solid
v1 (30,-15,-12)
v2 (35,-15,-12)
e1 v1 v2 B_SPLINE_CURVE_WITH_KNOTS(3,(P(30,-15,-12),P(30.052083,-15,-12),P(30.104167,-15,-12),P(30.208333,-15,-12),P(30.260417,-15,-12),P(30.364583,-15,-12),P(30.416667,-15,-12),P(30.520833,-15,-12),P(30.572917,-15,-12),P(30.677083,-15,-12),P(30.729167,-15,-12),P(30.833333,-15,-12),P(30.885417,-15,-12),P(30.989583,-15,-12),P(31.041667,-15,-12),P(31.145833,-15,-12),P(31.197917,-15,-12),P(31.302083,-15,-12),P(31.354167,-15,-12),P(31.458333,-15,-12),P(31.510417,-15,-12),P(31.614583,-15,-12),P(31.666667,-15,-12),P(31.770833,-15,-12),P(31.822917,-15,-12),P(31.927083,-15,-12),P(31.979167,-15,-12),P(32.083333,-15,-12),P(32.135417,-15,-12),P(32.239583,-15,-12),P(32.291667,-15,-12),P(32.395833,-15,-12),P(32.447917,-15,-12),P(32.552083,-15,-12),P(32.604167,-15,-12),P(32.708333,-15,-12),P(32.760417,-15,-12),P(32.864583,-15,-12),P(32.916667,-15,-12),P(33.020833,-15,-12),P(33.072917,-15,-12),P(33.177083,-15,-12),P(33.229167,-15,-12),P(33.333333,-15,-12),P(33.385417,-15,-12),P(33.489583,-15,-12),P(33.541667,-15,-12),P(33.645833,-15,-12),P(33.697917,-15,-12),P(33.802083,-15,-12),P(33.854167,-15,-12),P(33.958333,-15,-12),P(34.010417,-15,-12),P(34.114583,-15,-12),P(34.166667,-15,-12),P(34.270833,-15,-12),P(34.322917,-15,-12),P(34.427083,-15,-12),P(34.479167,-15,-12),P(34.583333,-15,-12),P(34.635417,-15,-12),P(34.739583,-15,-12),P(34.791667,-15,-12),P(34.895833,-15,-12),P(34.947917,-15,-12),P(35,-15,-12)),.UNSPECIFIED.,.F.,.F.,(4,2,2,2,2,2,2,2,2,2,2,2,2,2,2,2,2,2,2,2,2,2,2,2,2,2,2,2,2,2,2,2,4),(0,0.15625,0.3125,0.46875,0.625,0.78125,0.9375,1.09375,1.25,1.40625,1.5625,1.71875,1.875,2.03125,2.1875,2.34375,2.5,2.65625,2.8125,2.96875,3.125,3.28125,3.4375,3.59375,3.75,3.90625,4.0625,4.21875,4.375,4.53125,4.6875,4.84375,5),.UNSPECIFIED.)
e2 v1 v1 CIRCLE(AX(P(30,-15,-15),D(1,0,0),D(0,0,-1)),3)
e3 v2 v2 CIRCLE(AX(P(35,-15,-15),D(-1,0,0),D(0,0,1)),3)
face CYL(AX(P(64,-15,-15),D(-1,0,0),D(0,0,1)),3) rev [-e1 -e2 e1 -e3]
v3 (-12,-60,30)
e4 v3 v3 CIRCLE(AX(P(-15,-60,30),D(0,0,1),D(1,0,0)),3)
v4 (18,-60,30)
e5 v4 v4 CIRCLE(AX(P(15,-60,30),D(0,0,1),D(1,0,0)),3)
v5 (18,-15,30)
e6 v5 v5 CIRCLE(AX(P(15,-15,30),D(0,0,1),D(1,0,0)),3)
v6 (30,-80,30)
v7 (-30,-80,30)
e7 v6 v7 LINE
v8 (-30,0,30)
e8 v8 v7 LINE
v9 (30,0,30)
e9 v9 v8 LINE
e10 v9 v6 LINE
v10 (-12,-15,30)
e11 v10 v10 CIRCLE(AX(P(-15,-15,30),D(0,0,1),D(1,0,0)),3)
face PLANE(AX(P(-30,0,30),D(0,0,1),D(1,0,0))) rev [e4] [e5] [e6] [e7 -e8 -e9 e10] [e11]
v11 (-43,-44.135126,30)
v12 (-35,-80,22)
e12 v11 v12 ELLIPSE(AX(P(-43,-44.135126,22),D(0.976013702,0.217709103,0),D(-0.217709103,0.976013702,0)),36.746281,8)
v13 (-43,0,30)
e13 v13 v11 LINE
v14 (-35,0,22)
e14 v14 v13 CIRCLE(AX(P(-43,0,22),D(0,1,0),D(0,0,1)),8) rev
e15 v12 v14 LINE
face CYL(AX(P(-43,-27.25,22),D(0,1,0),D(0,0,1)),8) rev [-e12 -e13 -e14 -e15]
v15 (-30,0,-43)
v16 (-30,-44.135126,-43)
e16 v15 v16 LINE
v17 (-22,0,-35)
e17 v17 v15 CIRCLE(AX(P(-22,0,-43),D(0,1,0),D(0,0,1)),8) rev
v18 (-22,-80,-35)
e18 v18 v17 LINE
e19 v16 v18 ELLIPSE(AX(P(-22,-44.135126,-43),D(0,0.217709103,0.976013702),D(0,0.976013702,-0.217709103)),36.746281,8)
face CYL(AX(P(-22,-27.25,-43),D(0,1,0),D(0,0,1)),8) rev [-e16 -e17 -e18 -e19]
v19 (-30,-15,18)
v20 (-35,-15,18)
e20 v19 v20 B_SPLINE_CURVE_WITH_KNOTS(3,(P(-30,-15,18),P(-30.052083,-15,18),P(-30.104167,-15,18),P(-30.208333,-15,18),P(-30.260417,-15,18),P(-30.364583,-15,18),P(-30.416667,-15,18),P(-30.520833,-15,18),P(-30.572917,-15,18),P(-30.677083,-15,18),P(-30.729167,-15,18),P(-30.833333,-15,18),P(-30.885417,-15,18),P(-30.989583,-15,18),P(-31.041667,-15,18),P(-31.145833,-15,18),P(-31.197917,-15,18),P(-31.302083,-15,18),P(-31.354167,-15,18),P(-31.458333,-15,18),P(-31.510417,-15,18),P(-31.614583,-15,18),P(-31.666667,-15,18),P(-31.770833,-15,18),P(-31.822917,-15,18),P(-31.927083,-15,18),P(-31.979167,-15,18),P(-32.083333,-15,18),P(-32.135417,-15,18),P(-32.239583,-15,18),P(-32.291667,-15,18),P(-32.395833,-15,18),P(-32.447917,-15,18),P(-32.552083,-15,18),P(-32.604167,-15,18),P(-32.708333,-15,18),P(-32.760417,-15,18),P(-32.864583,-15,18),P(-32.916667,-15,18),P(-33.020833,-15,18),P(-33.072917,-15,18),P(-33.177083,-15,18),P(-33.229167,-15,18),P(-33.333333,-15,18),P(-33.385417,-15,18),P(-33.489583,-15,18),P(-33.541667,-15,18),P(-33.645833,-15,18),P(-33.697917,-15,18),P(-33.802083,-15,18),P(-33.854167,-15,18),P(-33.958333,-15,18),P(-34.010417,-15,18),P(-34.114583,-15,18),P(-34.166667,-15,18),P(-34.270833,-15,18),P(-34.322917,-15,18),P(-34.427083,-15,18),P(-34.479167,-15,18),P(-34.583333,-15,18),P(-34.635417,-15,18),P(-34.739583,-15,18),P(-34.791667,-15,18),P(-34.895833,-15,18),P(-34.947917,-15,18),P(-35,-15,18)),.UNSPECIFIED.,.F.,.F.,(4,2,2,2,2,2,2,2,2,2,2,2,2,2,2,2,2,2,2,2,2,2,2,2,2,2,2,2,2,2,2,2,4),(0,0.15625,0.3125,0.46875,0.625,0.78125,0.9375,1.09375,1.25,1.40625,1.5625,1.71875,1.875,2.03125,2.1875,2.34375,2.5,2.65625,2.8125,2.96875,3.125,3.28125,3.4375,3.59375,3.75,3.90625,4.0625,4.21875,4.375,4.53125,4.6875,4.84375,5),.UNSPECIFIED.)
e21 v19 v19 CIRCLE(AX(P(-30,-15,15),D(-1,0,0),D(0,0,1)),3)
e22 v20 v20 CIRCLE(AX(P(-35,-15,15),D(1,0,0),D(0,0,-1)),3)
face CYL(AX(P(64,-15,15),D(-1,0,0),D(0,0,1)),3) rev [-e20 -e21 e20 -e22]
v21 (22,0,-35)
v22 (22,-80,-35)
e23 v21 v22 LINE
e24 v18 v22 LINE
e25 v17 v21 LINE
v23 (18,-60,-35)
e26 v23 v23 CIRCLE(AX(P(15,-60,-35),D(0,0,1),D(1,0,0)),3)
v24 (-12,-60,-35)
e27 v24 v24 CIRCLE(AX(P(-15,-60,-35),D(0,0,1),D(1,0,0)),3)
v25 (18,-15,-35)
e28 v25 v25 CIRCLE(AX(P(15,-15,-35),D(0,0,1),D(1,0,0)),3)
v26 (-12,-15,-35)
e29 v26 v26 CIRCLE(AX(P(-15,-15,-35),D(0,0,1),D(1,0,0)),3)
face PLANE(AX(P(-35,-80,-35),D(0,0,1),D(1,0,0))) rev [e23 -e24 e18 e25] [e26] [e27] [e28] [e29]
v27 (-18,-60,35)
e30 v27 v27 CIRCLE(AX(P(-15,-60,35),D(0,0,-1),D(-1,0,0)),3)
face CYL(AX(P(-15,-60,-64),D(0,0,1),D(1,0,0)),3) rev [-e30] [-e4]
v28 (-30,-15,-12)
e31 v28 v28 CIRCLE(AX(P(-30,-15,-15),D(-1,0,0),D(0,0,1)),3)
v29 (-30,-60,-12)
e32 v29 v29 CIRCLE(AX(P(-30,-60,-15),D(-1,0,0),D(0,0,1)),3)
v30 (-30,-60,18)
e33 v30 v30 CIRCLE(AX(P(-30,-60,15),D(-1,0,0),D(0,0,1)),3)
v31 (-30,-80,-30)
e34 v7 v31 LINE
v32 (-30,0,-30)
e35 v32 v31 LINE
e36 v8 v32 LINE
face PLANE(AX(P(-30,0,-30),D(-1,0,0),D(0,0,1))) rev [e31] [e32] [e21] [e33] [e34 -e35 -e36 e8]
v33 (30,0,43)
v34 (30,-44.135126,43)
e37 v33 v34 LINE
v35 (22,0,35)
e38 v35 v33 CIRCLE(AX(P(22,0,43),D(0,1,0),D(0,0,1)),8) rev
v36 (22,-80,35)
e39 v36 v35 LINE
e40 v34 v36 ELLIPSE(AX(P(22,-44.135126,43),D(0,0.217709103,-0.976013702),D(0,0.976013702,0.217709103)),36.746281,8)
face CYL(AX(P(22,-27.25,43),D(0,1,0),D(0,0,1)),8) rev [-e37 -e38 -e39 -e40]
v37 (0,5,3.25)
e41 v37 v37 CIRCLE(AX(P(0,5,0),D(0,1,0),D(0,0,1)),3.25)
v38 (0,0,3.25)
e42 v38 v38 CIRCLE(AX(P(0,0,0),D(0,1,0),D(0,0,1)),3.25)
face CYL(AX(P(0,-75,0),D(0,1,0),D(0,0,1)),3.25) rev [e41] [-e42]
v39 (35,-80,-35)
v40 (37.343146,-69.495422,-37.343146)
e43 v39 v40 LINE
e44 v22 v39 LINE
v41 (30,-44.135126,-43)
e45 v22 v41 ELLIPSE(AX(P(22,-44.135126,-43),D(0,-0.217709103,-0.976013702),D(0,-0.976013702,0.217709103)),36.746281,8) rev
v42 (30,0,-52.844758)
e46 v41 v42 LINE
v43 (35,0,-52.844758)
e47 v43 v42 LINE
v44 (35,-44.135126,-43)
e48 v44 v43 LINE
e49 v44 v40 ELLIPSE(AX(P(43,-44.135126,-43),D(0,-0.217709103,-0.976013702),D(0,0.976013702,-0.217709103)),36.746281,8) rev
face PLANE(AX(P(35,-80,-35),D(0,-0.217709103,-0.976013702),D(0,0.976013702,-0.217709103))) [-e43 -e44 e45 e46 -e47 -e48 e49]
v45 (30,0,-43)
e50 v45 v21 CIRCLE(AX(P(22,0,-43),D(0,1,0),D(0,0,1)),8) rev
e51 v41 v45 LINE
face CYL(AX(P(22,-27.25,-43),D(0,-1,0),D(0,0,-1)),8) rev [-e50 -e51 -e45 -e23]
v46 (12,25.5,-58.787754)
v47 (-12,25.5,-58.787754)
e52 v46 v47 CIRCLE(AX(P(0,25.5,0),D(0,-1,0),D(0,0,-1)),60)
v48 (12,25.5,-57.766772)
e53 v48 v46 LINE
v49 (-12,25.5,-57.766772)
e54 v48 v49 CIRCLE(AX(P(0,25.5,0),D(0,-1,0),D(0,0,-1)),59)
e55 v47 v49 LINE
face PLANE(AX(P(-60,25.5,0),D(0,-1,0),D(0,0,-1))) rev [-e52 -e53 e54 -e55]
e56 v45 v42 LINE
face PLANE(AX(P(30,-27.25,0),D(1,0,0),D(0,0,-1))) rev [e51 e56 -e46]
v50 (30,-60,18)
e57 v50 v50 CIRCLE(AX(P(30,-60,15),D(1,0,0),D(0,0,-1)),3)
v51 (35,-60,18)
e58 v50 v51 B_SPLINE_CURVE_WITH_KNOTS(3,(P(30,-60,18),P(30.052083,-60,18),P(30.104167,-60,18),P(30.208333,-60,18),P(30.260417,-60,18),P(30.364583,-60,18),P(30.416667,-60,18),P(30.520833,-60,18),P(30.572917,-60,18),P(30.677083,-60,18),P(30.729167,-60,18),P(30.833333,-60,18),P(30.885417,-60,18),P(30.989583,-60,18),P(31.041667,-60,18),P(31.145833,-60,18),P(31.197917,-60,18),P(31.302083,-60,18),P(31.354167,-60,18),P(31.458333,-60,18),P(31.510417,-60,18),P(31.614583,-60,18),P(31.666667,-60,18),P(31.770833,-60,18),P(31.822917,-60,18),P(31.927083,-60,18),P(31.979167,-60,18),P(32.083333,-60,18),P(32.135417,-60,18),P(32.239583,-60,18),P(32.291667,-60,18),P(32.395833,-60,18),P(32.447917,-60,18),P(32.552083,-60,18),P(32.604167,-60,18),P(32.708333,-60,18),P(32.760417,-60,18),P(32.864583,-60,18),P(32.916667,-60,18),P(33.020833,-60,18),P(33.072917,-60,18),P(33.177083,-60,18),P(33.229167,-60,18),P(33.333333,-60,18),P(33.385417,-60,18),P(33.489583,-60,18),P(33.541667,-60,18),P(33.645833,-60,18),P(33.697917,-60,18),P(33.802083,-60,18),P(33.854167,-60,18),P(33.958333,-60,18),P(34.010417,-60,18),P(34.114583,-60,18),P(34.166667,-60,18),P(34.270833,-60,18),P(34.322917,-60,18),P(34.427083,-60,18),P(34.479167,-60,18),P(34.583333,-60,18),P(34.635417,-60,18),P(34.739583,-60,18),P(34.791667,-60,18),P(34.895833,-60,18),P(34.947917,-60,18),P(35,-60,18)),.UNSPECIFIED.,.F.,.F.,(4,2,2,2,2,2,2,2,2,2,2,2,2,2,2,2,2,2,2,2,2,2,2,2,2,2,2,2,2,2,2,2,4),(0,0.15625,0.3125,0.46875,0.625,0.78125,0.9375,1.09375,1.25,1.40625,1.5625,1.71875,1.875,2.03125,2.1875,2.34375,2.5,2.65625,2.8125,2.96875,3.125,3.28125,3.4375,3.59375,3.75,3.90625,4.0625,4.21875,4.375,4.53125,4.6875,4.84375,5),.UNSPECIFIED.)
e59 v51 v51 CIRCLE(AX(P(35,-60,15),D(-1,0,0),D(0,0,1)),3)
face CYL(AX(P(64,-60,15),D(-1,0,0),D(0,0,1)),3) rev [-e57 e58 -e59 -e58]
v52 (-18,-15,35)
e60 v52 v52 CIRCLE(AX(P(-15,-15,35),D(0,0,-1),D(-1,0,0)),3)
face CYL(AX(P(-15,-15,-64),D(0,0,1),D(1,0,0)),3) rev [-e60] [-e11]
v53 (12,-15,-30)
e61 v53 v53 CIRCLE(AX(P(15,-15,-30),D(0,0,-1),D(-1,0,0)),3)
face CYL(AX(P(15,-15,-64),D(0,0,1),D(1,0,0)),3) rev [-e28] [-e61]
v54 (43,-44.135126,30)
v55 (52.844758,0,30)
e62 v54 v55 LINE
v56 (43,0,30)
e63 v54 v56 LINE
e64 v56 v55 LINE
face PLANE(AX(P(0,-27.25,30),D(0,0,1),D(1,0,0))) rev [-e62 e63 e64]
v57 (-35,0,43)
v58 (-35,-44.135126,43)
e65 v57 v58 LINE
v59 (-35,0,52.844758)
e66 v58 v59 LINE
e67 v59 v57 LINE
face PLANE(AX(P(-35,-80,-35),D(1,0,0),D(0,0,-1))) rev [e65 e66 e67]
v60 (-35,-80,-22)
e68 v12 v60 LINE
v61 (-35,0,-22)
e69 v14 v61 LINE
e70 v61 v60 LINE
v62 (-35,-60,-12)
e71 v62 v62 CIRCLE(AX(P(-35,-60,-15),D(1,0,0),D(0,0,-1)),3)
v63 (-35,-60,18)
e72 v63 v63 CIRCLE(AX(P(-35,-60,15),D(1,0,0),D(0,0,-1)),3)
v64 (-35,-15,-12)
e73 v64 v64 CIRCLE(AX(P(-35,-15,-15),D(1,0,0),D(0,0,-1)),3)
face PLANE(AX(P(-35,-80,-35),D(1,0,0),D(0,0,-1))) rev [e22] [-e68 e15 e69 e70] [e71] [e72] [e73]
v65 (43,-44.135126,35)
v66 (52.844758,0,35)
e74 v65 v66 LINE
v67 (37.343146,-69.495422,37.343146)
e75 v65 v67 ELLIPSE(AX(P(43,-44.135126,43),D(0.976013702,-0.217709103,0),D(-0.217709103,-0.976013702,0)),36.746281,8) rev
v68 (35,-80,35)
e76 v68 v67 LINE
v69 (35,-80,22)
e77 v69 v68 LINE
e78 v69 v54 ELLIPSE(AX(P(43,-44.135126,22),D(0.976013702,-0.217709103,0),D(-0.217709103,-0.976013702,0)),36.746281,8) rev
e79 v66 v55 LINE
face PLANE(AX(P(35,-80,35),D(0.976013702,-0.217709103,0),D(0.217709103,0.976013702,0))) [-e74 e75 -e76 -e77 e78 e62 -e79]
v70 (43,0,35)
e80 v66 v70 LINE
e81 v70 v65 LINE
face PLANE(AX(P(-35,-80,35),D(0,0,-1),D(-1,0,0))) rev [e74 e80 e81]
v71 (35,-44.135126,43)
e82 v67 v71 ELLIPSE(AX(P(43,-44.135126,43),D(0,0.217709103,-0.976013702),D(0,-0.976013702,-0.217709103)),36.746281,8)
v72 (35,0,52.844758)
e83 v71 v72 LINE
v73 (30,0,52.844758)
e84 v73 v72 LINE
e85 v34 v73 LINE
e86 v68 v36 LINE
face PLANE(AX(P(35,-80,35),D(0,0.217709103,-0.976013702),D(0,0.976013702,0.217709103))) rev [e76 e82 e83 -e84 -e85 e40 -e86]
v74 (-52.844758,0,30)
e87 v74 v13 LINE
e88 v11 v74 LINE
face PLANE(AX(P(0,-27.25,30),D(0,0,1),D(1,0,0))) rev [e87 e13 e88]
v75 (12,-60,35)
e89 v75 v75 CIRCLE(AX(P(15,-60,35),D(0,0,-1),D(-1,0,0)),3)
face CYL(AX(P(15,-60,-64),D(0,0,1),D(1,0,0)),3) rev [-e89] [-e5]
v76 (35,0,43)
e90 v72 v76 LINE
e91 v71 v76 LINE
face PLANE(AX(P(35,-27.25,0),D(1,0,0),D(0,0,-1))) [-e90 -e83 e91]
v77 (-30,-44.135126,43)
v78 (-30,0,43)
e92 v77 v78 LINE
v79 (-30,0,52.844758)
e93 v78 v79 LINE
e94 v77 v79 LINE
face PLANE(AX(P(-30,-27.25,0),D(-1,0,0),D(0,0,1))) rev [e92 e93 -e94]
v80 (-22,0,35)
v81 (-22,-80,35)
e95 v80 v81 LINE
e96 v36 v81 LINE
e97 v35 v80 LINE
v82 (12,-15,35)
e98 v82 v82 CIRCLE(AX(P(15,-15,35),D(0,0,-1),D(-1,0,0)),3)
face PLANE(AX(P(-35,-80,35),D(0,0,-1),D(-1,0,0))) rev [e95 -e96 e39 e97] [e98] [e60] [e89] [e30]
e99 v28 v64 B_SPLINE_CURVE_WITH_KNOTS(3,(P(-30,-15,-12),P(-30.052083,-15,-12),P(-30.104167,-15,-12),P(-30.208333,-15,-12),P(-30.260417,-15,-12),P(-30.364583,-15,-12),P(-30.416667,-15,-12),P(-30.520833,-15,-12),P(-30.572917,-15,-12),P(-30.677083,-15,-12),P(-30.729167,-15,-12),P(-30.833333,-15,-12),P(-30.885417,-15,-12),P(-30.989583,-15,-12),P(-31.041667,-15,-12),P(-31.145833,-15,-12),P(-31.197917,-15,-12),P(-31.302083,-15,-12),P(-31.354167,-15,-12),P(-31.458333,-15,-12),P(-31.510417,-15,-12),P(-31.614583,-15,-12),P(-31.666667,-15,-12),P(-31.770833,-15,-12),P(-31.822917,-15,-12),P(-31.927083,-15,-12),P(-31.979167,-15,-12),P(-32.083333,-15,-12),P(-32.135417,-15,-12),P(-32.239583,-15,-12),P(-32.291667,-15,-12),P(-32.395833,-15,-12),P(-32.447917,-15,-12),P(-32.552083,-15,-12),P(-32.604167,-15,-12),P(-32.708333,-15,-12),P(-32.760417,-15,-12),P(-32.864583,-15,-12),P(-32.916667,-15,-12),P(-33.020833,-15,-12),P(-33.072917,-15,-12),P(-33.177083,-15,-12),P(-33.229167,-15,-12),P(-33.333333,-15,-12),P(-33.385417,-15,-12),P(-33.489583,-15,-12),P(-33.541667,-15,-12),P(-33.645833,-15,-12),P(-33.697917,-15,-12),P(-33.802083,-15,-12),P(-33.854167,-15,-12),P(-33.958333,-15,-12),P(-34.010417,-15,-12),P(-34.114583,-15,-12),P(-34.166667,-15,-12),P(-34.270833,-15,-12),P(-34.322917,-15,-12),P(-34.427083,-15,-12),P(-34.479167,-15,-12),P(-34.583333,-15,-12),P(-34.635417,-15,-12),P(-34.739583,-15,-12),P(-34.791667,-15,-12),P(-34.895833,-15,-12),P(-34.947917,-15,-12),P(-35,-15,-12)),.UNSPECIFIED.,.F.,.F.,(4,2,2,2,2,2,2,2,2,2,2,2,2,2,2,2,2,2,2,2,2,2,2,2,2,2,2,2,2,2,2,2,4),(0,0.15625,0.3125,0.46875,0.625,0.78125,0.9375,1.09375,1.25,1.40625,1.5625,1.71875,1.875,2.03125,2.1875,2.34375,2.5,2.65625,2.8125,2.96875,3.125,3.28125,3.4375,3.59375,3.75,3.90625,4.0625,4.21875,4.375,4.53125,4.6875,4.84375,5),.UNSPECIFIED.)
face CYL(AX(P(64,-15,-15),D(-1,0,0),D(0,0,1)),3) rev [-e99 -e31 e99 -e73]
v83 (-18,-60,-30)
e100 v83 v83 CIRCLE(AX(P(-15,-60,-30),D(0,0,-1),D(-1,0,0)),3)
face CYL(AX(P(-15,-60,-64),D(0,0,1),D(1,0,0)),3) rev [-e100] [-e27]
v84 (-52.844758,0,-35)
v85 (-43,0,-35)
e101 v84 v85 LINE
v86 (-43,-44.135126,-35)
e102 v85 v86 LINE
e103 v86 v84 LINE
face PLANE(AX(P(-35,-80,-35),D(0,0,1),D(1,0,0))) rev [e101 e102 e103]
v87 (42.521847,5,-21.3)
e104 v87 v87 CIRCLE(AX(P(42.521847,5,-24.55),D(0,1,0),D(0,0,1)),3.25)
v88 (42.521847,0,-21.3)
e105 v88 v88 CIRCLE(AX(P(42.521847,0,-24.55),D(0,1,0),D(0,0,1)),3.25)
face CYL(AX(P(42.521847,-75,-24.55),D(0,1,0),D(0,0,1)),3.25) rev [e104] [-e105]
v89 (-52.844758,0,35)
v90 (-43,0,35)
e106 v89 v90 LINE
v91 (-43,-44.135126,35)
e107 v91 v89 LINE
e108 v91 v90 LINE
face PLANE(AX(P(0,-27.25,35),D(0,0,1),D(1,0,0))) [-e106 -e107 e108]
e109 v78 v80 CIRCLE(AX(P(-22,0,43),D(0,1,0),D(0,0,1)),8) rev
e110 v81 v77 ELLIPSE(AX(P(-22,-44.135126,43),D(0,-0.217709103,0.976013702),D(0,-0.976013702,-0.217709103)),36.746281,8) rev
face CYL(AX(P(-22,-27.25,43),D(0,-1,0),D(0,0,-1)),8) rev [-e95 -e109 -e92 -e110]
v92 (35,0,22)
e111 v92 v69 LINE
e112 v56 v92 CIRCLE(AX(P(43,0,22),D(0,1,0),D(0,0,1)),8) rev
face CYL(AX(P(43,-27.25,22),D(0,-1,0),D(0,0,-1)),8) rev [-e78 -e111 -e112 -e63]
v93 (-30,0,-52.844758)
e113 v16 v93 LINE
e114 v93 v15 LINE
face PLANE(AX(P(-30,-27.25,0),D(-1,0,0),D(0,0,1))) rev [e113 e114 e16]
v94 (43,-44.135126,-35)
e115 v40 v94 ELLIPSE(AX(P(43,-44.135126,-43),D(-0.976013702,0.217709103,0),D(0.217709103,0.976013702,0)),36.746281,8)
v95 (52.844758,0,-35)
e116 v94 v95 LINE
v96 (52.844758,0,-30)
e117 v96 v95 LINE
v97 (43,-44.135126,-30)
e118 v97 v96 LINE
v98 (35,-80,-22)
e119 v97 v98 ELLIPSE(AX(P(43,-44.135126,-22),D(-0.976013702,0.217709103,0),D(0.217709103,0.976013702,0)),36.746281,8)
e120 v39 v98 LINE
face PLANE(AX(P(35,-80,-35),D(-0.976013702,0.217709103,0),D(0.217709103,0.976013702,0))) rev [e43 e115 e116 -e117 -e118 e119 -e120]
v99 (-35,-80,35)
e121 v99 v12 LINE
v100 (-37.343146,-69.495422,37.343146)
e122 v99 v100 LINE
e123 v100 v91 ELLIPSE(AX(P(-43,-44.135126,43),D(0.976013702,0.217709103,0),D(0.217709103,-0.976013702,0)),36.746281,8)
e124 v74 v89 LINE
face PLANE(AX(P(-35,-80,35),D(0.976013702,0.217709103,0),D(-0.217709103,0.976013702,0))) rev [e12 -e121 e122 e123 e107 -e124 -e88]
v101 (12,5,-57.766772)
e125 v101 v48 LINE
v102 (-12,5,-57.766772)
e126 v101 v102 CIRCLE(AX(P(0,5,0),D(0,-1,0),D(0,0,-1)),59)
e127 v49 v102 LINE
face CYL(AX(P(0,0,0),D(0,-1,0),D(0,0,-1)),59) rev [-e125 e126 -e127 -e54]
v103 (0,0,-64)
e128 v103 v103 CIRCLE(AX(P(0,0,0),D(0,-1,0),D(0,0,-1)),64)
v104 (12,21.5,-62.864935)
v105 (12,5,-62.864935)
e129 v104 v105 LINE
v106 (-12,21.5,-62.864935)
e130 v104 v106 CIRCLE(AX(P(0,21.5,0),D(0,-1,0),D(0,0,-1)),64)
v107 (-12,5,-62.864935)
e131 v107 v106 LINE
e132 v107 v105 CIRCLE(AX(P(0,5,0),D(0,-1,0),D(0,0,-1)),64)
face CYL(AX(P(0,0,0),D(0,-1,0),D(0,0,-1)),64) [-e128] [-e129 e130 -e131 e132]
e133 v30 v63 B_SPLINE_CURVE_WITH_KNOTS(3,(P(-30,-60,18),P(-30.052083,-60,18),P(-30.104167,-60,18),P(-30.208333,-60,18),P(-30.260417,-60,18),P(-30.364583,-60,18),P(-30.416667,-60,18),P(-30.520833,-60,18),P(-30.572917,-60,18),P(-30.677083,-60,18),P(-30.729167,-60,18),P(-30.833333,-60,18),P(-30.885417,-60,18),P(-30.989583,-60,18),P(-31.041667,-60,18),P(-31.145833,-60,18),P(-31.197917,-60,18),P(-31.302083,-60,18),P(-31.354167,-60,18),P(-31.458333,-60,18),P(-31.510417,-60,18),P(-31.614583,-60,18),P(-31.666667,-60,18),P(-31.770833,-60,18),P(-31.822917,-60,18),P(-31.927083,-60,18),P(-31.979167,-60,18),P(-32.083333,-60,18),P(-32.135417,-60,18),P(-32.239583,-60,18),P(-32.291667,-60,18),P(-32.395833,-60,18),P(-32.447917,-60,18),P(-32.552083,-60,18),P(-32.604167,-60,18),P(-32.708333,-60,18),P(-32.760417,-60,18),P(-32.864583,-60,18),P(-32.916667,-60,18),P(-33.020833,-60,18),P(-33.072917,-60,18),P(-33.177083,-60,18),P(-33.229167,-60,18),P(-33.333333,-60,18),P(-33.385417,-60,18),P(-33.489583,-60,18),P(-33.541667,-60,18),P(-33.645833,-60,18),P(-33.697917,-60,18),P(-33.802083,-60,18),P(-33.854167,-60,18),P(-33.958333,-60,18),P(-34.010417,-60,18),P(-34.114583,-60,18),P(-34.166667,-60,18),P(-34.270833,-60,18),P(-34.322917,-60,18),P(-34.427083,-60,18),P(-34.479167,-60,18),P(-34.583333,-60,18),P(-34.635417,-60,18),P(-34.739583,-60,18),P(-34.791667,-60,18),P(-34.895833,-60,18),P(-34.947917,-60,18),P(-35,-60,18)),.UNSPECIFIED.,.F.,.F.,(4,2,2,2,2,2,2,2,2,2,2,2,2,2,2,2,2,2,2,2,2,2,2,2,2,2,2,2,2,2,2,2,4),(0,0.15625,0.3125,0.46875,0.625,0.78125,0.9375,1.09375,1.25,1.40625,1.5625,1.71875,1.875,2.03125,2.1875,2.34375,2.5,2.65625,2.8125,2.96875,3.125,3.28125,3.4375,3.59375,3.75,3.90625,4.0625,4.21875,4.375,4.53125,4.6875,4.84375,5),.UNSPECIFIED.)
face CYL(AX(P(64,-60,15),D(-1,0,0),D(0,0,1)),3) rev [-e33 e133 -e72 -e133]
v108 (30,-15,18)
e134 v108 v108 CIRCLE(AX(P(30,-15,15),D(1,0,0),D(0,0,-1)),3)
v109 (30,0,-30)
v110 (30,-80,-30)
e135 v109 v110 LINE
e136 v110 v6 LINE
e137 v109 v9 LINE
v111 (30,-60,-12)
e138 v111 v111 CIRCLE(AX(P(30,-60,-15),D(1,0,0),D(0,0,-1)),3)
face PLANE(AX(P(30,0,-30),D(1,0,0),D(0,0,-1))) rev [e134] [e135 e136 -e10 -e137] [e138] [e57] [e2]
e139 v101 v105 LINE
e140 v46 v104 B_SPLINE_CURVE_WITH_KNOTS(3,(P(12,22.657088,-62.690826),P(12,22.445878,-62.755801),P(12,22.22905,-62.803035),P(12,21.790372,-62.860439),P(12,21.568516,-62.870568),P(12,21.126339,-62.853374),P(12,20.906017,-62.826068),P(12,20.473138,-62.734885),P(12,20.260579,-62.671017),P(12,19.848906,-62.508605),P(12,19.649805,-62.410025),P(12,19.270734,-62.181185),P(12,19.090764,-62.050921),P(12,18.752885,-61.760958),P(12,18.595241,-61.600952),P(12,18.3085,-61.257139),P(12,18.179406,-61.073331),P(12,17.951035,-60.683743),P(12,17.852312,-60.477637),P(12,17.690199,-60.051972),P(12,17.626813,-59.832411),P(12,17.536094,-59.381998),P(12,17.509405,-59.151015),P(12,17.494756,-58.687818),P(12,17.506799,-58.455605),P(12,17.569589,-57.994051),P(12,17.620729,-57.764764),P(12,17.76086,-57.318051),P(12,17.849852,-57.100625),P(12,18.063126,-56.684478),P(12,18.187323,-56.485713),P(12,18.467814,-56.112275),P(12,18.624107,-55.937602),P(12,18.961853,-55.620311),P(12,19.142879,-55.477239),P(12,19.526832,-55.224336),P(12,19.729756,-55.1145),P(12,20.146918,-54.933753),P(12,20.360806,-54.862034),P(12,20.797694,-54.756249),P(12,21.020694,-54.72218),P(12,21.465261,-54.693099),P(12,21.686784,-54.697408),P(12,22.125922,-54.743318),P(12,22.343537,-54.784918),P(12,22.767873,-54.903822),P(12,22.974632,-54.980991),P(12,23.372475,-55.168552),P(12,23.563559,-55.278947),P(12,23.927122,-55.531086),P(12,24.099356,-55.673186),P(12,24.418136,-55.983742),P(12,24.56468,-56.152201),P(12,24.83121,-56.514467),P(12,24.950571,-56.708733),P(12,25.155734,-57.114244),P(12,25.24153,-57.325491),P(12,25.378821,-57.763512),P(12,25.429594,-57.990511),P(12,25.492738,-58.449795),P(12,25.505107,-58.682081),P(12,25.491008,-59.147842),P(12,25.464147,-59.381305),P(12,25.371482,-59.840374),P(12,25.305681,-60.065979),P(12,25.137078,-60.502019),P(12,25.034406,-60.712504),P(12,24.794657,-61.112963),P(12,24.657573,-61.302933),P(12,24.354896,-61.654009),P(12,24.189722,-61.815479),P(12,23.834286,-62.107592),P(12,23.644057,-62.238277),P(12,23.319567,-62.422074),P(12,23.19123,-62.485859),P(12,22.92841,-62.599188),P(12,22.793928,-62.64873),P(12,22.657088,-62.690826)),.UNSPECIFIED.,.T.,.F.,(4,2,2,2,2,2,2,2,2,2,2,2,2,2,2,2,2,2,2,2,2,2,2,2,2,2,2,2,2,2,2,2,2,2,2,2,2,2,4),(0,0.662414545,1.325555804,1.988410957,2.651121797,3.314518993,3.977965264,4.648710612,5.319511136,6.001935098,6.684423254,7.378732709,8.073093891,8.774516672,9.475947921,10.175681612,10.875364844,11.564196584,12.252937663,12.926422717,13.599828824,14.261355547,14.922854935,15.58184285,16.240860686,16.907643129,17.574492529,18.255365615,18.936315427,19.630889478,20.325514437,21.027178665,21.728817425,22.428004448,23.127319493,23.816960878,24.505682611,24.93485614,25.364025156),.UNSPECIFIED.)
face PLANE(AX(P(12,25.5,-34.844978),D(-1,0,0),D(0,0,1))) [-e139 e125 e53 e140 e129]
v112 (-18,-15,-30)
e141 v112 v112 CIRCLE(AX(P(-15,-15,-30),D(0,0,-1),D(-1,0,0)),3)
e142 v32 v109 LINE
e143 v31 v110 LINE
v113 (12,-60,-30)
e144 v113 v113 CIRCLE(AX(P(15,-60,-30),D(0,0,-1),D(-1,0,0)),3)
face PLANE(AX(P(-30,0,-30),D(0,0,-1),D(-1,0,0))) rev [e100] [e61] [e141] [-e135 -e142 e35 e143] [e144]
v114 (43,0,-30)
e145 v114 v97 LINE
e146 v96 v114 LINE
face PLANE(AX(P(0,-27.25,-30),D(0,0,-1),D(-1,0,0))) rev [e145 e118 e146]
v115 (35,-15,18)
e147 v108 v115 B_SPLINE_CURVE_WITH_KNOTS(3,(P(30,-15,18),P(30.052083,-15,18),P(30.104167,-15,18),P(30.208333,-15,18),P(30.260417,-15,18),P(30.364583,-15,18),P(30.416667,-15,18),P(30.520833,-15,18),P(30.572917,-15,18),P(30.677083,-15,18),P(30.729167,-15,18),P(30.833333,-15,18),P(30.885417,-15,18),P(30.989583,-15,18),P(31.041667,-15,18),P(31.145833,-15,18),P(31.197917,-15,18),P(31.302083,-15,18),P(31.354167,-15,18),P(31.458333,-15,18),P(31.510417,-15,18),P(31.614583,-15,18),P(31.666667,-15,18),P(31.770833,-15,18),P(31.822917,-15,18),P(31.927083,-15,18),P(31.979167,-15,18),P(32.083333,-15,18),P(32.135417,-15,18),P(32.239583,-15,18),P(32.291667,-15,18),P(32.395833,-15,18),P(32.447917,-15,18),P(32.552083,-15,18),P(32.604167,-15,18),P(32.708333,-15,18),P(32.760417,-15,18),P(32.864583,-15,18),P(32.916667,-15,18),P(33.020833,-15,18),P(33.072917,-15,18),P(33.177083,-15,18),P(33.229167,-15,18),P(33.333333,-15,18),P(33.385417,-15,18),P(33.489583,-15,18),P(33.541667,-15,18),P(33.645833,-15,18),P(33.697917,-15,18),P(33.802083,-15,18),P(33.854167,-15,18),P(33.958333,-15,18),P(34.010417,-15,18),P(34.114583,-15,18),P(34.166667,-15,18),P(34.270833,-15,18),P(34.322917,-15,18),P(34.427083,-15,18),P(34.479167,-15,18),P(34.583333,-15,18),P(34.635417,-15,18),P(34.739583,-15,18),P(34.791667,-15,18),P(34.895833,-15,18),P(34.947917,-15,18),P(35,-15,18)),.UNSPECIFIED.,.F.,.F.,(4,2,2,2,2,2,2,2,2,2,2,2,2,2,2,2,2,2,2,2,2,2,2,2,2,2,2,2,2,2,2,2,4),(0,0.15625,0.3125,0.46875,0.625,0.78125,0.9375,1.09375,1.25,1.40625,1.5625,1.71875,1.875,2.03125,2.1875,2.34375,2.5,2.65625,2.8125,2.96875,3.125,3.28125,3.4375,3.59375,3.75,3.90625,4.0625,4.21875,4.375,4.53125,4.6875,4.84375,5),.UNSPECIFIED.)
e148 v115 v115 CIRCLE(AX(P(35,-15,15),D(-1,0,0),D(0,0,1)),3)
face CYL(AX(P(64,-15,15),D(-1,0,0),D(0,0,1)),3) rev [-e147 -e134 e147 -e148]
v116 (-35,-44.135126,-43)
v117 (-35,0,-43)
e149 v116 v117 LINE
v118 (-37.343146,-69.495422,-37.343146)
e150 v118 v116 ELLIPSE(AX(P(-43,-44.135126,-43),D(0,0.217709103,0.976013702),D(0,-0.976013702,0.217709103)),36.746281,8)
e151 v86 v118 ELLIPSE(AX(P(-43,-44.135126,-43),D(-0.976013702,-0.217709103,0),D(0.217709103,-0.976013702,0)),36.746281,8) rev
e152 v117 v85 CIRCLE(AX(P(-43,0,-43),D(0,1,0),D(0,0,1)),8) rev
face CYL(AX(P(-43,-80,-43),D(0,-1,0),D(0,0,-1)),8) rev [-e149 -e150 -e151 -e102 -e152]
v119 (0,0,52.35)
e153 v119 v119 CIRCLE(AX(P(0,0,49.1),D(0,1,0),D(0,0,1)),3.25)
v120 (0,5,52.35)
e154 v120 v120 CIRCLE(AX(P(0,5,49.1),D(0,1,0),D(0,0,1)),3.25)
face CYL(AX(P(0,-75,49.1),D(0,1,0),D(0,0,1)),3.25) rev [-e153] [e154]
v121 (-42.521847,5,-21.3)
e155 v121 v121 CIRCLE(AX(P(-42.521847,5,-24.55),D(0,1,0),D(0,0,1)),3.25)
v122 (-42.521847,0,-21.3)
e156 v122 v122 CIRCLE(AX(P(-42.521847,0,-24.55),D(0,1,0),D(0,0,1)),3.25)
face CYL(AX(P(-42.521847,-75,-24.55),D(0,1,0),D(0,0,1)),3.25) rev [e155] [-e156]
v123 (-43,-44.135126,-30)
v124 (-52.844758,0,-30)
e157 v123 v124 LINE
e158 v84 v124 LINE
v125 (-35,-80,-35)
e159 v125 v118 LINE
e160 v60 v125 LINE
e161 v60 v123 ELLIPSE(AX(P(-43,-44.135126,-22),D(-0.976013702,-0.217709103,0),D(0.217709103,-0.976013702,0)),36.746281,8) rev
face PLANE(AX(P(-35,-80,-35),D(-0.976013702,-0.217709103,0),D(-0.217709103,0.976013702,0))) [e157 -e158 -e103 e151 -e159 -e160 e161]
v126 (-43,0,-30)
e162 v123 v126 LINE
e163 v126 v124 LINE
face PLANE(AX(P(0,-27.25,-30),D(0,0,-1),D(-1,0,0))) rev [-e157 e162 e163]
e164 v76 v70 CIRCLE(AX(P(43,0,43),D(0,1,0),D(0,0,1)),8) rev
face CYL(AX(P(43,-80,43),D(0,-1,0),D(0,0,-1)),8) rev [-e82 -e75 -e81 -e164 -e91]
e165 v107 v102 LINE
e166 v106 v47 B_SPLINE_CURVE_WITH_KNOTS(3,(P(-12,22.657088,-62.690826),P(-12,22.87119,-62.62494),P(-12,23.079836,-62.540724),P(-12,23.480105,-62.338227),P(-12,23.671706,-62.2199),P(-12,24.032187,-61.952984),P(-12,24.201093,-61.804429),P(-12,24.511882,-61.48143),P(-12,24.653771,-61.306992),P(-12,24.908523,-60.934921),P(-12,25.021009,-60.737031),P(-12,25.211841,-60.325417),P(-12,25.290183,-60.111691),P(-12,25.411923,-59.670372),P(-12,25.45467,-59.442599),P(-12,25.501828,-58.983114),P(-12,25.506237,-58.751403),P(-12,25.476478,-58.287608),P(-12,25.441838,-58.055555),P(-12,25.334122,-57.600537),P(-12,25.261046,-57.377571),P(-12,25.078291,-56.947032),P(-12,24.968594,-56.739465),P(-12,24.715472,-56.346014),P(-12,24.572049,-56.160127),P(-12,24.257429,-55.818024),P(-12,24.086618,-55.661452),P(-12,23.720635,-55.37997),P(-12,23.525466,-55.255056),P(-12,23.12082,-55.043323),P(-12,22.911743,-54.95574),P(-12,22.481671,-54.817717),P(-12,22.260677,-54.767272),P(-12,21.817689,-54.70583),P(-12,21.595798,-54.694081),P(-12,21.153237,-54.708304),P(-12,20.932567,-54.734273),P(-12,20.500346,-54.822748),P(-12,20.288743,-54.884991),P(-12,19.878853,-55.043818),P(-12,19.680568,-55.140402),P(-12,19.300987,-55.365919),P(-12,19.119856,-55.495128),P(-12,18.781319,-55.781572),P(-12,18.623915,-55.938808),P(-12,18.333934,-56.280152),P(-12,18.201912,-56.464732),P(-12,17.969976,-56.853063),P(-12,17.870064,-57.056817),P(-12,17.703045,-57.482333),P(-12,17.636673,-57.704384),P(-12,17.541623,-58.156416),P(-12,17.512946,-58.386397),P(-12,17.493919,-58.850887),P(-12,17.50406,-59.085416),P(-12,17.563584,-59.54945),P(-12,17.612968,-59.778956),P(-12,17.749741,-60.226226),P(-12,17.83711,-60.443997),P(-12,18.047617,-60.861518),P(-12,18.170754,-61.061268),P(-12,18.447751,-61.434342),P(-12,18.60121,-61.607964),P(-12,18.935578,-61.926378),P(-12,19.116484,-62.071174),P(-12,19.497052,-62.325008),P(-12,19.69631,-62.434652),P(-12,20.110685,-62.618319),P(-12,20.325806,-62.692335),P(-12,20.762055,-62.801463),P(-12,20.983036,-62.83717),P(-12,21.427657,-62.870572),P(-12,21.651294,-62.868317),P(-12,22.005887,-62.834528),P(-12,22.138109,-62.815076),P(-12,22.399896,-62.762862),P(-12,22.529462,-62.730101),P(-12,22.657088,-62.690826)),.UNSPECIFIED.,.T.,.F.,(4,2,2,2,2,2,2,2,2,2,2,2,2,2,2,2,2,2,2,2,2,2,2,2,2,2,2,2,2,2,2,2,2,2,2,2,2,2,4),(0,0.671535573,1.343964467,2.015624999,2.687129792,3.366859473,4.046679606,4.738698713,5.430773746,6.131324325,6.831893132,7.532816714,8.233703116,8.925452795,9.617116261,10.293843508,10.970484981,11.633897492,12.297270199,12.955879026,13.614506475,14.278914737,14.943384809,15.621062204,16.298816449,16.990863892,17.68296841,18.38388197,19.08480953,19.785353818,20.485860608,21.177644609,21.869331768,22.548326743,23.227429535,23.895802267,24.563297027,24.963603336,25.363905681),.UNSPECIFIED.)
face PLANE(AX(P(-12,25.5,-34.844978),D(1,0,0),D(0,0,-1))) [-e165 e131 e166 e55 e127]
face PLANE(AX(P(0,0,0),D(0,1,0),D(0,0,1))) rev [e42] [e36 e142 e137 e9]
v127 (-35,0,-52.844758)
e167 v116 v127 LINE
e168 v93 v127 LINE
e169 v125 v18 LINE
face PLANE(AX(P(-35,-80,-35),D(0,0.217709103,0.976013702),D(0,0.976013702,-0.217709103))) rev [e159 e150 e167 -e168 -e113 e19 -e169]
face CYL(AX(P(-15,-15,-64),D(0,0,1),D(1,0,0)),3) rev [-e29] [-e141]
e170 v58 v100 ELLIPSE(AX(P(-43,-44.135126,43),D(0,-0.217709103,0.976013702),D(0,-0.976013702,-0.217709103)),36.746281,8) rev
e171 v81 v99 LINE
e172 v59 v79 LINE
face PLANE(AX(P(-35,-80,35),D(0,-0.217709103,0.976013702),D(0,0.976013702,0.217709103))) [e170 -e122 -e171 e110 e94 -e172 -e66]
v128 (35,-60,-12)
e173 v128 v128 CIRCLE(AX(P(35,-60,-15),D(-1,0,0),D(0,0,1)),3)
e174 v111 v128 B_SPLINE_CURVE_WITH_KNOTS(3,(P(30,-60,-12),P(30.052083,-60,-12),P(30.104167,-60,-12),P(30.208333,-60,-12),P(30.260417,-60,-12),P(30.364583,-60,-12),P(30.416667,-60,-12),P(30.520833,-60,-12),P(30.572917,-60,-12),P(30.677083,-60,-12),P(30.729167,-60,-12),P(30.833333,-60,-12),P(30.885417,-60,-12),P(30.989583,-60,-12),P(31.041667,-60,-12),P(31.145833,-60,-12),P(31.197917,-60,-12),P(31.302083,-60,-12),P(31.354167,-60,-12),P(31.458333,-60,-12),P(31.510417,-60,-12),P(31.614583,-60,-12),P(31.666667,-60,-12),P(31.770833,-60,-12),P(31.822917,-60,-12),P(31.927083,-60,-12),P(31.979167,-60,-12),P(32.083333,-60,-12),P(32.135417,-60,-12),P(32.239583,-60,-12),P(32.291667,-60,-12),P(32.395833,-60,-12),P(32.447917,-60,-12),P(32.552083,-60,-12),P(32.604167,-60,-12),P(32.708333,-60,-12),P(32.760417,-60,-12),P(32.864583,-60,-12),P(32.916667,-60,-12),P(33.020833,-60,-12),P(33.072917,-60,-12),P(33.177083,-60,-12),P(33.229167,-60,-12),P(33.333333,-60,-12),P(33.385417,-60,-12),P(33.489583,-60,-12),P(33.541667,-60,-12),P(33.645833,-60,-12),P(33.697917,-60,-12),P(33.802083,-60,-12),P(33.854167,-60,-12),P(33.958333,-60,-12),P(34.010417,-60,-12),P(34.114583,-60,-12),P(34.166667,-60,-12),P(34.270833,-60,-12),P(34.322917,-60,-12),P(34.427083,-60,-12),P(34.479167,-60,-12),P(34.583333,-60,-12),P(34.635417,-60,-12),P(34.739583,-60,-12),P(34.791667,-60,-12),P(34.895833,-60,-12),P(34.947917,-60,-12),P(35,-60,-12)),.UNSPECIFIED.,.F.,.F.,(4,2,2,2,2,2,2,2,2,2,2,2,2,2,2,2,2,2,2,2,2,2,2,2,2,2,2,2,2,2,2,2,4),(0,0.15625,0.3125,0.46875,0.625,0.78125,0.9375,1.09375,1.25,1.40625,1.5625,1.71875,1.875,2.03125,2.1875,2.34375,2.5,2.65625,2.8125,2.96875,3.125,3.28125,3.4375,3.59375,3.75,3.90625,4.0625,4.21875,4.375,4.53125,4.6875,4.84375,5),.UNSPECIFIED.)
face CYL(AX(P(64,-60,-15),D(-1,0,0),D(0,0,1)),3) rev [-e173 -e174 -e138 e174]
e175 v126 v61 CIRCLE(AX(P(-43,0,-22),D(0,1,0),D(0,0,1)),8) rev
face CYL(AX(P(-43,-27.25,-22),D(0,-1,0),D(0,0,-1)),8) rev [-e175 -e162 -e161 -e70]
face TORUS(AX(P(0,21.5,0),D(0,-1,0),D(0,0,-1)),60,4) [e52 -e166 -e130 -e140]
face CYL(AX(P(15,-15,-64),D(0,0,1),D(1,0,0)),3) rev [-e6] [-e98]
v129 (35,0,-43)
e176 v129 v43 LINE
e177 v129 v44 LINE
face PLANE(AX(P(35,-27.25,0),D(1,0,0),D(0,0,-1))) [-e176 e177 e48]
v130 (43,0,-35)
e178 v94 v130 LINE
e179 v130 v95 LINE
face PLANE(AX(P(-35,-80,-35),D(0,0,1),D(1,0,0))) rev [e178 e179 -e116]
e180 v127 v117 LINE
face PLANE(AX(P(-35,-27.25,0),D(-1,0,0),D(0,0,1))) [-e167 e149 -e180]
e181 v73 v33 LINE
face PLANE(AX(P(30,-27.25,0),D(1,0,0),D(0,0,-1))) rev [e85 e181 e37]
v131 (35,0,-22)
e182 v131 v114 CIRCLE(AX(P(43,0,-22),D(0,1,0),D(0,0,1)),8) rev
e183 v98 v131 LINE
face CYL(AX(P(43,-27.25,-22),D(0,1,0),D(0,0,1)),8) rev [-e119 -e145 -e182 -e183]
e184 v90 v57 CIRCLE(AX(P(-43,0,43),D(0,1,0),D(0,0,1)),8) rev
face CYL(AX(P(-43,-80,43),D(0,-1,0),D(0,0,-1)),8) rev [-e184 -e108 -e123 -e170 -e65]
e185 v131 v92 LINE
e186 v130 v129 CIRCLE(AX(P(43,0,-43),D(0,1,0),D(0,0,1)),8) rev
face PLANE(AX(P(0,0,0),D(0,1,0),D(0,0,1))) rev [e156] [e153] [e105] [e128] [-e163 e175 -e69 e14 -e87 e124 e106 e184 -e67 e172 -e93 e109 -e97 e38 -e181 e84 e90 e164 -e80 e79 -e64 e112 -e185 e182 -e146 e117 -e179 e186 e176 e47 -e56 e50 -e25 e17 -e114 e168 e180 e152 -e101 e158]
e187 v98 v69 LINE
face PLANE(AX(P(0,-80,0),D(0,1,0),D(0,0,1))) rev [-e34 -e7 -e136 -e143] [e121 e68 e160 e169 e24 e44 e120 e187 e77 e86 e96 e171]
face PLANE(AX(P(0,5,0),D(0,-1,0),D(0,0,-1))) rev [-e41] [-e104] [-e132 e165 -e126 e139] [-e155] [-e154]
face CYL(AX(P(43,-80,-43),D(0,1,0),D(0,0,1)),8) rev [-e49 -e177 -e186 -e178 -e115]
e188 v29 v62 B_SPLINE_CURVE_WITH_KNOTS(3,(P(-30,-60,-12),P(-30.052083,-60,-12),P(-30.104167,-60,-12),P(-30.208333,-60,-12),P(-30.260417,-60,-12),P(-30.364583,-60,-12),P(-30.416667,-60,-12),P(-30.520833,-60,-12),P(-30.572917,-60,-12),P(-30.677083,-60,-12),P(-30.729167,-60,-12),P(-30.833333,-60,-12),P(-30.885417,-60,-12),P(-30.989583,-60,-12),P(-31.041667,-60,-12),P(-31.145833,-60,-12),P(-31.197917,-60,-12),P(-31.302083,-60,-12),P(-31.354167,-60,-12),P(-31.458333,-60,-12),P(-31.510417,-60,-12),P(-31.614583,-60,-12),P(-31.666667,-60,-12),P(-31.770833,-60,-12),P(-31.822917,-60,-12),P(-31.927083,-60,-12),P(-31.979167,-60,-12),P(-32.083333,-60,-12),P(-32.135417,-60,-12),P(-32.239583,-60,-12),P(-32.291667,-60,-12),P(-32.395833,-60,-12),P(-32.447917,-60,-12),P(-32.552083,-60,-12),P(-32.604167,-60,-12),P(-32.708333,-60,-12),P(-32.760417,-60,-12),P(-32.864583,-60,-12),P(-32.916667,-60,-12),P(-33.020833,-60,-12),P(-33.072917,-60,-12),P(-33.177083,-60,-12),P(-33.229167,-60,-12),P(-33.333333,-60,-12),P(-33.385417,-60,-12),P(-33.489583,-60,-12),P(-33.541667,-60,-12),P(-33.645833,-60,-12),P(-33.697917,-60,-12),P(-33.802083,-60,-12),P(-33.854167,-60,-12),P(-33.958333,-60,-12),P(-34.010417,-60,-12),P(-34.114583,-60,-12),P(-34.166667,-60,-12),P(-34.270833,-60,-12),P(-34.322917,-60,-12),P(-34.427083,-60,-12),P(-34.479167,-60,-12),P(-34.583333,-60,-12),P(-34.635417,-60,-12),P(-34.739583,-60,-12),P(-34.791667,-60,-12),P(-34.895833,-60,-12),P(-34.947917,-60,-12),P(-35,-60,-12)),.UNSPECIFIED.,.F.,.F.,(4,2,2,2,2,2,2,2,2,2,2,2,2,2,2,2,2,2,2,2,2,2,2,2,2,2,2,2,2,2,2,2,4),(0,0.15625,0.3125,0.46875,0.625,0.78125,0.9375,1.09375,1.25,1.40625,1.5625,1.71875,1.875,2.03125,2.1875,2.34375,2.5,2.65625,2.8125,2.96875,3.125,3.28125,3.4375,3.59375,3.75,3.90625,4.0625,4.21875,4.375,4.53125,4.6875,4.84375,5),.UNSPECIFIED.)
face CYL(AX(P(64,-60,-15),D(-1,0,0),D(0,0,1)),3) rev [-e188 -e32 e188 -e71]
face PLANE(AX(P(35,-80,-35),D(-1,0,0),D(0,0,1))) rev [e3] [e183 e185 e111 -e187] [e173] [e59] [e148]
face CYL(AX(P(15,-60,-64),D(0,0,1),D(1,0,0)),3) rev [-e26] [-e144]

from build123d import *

# Parameters (mm, degrees)
SKETCH_3_W                         = 70
SKETCH_3_H                         = 70
EXTRUDE_2_DEPTH                    = 80
SKETCH_5_W                         = 60
SKETCH_5_H                         = 60
CUT_EXTRUDE_2_DEPTH                = 80
SKETCH_6_R                         = 3.25
CUT_EXTRUDE_3_DEPTH                = 80
SKETCH_7_R                         = 3
CUT_EXTRUDE_4_DEPTH                = 143.467540163
RIB_13_REACH                       = 144.468
SKETCH_13_WALL_W                   = 368.901142734
SKETCH_13_WALL_H                   = 5
PATTERN_CIRCULAR_1_COUNT           = 4
PATTERN_CIRCULAR_1_COPY_1_REACH    = 144.468
PATTERN_CIRCULAR_1_COPY_1_SKETCH_W = 368.901142734
PATTERN_CIRCULAR_1_COPY_1_SKETCH_H = 5
PATTERN_CIRCULAR_1_COPY_2_REACH    = 144.468
PATTERN_CIRCULAR_1_COPY_2_SKETCH_W = 368.901142734
PATTERN_CIRCULAR_1_COPY_2_SKETCH_H = 5
PATTERN_CIRCULAR_1_COPY_3_REACH    = 144.468
PATTERN_CIRCULAR_1_COPY_3_SKETCH_W = 368.901142734
PATTERN_CIRCULAR_1_COPY_3_SKETCH_H = 5
SKETCH_15_W                        = 24
SKETCH_15_H                        = 39.427435321
CUT_EXTRUDE_5_DEPTH                = 125.165212519
FILLET_2_R                         = 8
PATTERN_CIRCULAR_2_COUNT           = 4


with BuildPart() as part:
    # 草图2 → 旋转1 (revolve)
    with BuildSketch(Plane.XY, mode=Mode.PRIVATE) as revolve_1_sk:
        with BuildLine():
            Line((-64, 5), (-64, 21.5))
            ThreePointArc((-64, 21.5), (-62.828427125, 24.328427125), (-60, 25.5))
            Line((-60, 25.5), (-59, 25.5))
            Line((-59, 25.5), (-59, 5))
            Line((-59, 5), (0, 5))
            Line((0, 5), (0, 0))
            Line((0, 0), (-64, 0))
            Line((-64, 0), (-64, 5))
        make_face()
    revolve(revolve_1_sk.sketch.rotate(Axis((0, 0, 0), (0, 1, 0)), 270), axis=Axis((0, 0, 0), (0, 1, 0)))

    # 草图3 → 凸台-拉伸2 (add)
    with BuildSketch(Plane.XZ):
        Rectangle(SKETCH_3_W, SKETCH_3_H)
    extrude(amount=EXTRUDE_2_DEPTH)

    # 草图5 → 切除-拉伸2 (cut)
    with BuildSketch(Plane.XZ.offset(80)):
        Rectangle(SKETCH_5_W, SKETCH_5_H)
    extrude(amount=-CUT_EXTRUDE_2_DEPTH, mode=Mode.SUBTRACT)

    # 草图6 → 切除-拉伸3 (cut)
    with BuildSketch(Plane(origin=(0, 5, 0), x_dir=(1, 0, 0), z_dir=(0, 1, 0))):
        with Locations(Location((0, 0, 0), (0, 0, 270))):
            Circle(SKETCH_6_R)
        with Locations(Location((0, -49.1, 0), (0, 0, 270))):
            Circle(SKETCH_6_R)
        with Locations(Location((-42.521847326, 24.55, 0), (0, 0, 270))):
            Circle(SKETCH_6_R)
        with Locations(Location((42.521847326, 24.55, 0), (0, 0, 270))):
            Circle(SKETCH_6_R)
    extrude(amount=-CUT_EXTRUDE_3_DEPTH, mode=Mode.SUBTRACT)

    # 草图7 → 切除-拉伸4 (cut, symmetric)
    with BuildSketch(Plane.XY.offset(35)):
        with Locations((-15, -60)):
            Circle(SKETCH_7_R)
        with Locations((-15, -15)):
            Circle(SKETCH_7_R)
        with Locations((15, -15)):
            Circle(SKETCH_7_R)
        with Locations((15, -60)):
            Circle(SKETCH_7_R)
    cut_extrude_4 = extrude(amount=CUT_EXTRUDE_4_DEPTH, both=True, mode=Mode.SUBTRACT)

    # 草图13 wall → 筋13 (add, up to next)
    with BuildSketch(Plane(origin=(43.922378982, -40, -35), x_dir=(0.217709103495, 0.976013701879, 0), z_dir=(0.976013701879, -0.217709103495, 0)), mode=Mode.PRIVATE) as rib_13_sk1:
        with Locations((0, 2.5)):
            Rectangle(SKETCH_13_WALL_W, SKETCH_13_WALL_H)
    rib_13_tool1 = extrude(rib_13_sk1.sketch, amount=-RIB_13_REACH, mode=Mode.PRIVATE) - part.part
    rib_13 = rib_13_tool1.solids().sort_by_distance((43.922378982, -40, -35))[0]
    add(rib_13)

    # 镜向2: 筋13 across plane
    add(rib_13.mirror(Plane.XY))

    # 阵列(圆周)1: 筋13 ×4 about axis
    pattern_circular_1_axis = Axis((0, 0, 0), (0, 1, 0))
    for i in range(1, PATTERN_CIRCULAR_1_COUNT):
        add(rib_13.rotate(pattern_circular_1_axis, i * 360 / PATTERN_CIRCULAR_1_COUNT))

    # 阵列(圆周)1 copy 1 sketch → 阵列(圆周)1 copy 1 (add, up to next)
    with BuildSketch(Plane(origin=(35, -40, -43.922378982), x_dir=(0, 0.976013701879, -0.217709103495), z_dir=(0, -0.217709103495, -0.976013701879)), mode=Mode.PRIVATE) as pattern_circular_1_copy_1_sk1:
        with Locations((0, -2.5)):
            Rectangle(PATTERN_CIRCULAR_1_COPY_1_SKETCH_W, PATTERN_CIRCULAR_1_COPY_1_SKETCH_H)
    pattern_circular_1_copy_1_tool1 = extrude(pattern_circular_1_copy_1_sk1.sketch, amount=-PATTERN_CIRCULAR_1_COPY_1_REACH, mode=Mode.PRIVATE) - part.part
    add(pattern_circular_1_copy_1_tool1.solids().sort_by_distance((35, -40, -43.922378982))[0])

    # 阵列(圆周)1 copy 2 sketch → 阵列(圆周)1 copy 2 (add, up to next)
    with BuildSketch(Plane(origin=(-43.922378982, -40, -35), x_dir=(-0.217709103495, 0.976013701879, 0), z_dir=(-0.976013701879, -0.217709103495, 0)), mode=Mode.PRIVATE) as pattern_circular_1_copy_2_sk1:
        with Locations((0, -2.5)):
            Rectangle(PATTERN_CIRCULAR_1_COPY_2_SKETCH_W, PATTERN_CIRCULAR_1_COPY_2_SKETCH_H)
    pattern_circular_1_copy_2_tool1 = extrude(pattern_circular_1_copy_2_sk1.sketch, amount=-PATTERN_CIRCULAR_1_COPY_2_REACH, mode=Mode.PRIVATE) - part.part
    add(pattern_circular_1_copy_2_tool1.solids().sort_by_distance((-43.922378982, -40, -35))[0])

    # 阵列(圆周)1 copy 3 sketch → 阵列(圆周)1 copy 3 (add, up to next)
    with BuildSketch(Plane(origin=(-35, -40, 43.922378982), x_dir=(0, 0.976013701879, 0.217709103495), z_dir=(0, -0.217709103495, 0.976013701879)), mode=Mode.PRIVATE) as pattern_circular_1_copy_3_sk1:
        with Locations((0, -2.5)):
            Rectangle(PATTERN_CIRCULAR_1_COPY_3_SKETCH_W, PATTERN_CIRCULAR_1_COPY_3_SKETCH_H)
    pattern_circular_1_copy_3_tool1 = extrude(pattern_circular_1_copy_3_sk1.sketch, amount=-PATTERN_CIRCULAR_1_COPY_3_REACH, mode=Mode.PRIVATE) - part.part
    add(pattern_circular_1_copy_3_tool1.solids().sort_by_distance((-35, -40, 43.922378982))[0])

    # 草图15 → 切除-拉伸5 (cut, through all)
    with BuildSketch(Plane(origin=(0, 5, 0), x_dir=(1, 0, 0), z_dir=(0, 1, 0))):
        with Locations((0, 54.558696029)):
            Rectangle(SKETCH_15_W, SKETCH_15_H)
    extrude(amount=CUT_EXTRUDE_5_DEPTH, mode=Mode.SUBTRACT)

    # 圆角2
    # the kernel refuses this fillet: 8 mm, written as the material it adds along each edge
    with BuildSketch(Plane(origin=(35, 0, -30), x_dir=(0, 0, 1), z_dir=(0, -1, 0))) as fillet_2_piece_1_section:
        with BuildLine():
            CenterArc((FILLET_2_R, -FILLET_2_R), FILLET_2_R, 90, 90)
            Line((0, -FILLET_2_R), (0, 0))
            Line((0, 0), (FILLET_2_R, 0))
        make_face()
    fillet_2_piece_1 = extrude(amount=80, mode=Mode.PRIVATE)
    fillet_2_piece_1 = split(fillet_2_piece_1, bisect_by=Plane(origin=(44.354586475, -38.062366579, -28.080040712), z_dir=(-0.9760137018789288, 0.2177091034949841, 0)), keep=Keep.TOP, mode=Mode.PRIVATE)
    add(fillet_2_piece_1)
    with BuildSketch(Plane(origin=(35, 0, 30), x_dir=(0, 0, -1), z_dir=(0, -1, 0))) as fillet_2_piece_2_section:
        with BuildLine():
            CenterArc((FILLET_2_R, FILLET_2_R), FILLET_2_R, 180, 90)
            Line((0, FILLET_2_R), (0, 0))
            Line((0, 0), (FILLET_2_R, 0))
        make_face()
    fillet_2_piece_2 = extrude(amount=80, mode=Mode.PRIVATE)
    fillet_2_piece_2 = split(fillet_2_piece_2, bisect_by=Plane(origin=(44.354586475, -38.062366579, 28.080040712), z_dir=(-0.9760137018789288, 0.2177091034949841, 0)), keep=Keep.TOP, mode=Mode.PRIVATE)
    add(fillet_2_piece_2)
    with BuildSketch(Plane(origin=(30, 0, -35), x_dir=(-1, 0, 0), z_dir=(0, -1, 0))) as fillet_2_piece_3_section:
        with BuildLine():
            CenterArc((FILLET_2_R, FILLET_2_R), FILLET_2_R, 180, 90)
            Line((0, FILLET_2_R), (0, 0))
            Line((0, 0), (FILLET_2_R, 0))
        make_face()
    fillet_2_piece_3 = extrude(amount=80, mode=Mode.PRIVATE)
    fillet_2_piece_3 = split(fillet_2_piece_3, bisect_by=Plane(origin=(28.080040712, -38.062366579, -44.354586475), z_dir=(0, 0.2177091034949841, 0.9760137018789288)), keep=Keep.TOP, mode=Mode.PRIVATE)
    add(fillet_2_piece_3)
    with BuildSketch(Plane(origin=(35, -100, -35), x_dir=(0, 0, -1), z_dir=(0, 1, 0))) as fillet_2_piece_4_section:
        with BuildLine():
            CenterArc((FILLET_2_R, -FILLET_2_R), FILLET_2_R, 90, 90)
            Line((0, -FILLET_2_R), (0, 0))
            Line((0, 0), (FILLET_2_R, 0))
        make_face()
    fillet_2_piece_4 = extrude(amount=100, mode=Mode.PRIVATE)
    fillet_2_piece_4 = split(fillet_2_piece_4, bisect_by=Plane(origin=(36.730940637, -35.444045901, -44.938627709), z_dir=(0, 0.2177091034949841, 0.9760137018789288)), keep=Keep.TOP, mode=Mode.PRIVATE)
    fillet_2_piece_4 = split(fillet_2_piece_4, bisect_by=Plane(origin=(44.938627709, -35.444045901, -36.730940637), z_dir=(-0.9760137018789288, 0.2177091034949841, 0)), keep=Keep.TOP, mode=Mode.PRIVATE)
    add(fillet_2_piece_4)
    with BuildSketch(Plane(origin=(-35, 0, -30), x_dir=(0, 0, 1), z_dir=(0, -1, 0))) as fillet_2_piece_5_section:
        with BuildLine():
            CenterArc((FILLET_2_R, FILLET_2_R), FILLET_2_R, 180, 90)
            Line((0, FILLET_2_R), (0, 0))
            Line((0, 0), (FILLET_2_R, 0))
        make_face()
    fillet_2_piece_5 = extrude(amount=80, mode=Mode.PRIVATE)
    fillet_2_piece_5 = split(fillet_2_piece_5, bisect_by=Plane(origin=(-44.354586475, -38.062366579, -28.080040712), z_dir=(0.9760137018789288, 0.2177091034949841, 0)), keep=Keep.TOP, mode=Mode.PRIVATE)
    add(fillet_2_piece_5)
    with BuildSketch(Plane(origin=(-30, 0, 35), x_dir=(1, 0, 0), z_dir=(0, -1, 0))) as fillet_2_piece_6_section:
        with BuildLine():
            CenterArc((FILLET_2_R, FILLET_2_R), FILLET_2_R, 180, 90)
            Line((0, FILLET_2_R), (0, 0))
            Line((0, 0), (FILLET_2_R, 0))
        make_face()
    fillet_2_piece_6 = extrude(amount=80, mode=Mode.PRIVATE)
    fillet_2_piece_6 = split(fillet_2_piece_6, bisect_by=Plane(origin=(-28.080040712, -38.062366579, 44.354586475), z_dir=(0, 0.2177091034949841, -0.9760137018789288)), keep=Keep.TOP, mode=Mode.PRIVATE)
    add(fillet_2_piece_6)
    with BuildSketch(Plane(origin=(-30, 0, -35), x_dir=(0, 0, -1), z_dir=(0, -1, 0))) as fillet_2_piece_7_section:
        with BuildLine():
            CenterArc((FILLET_2_R, FILLET_2_R), FILLET_2_R, 180, 90)
            Line((0, FILLET_2_R), (0, 0))
            Line((0, 0), (FILLET_2_R, 0))
        make_face()
    fillet_2_piece_7 = extrude(amount=80, mode=Mode.PRIVATE)
    fillet_2_piece_7 = split(fillet_2_piece_7, bisect_by=Plane(origin=(-28.080040712, -38.062366579, -44.354586475), z_dir=(0, 0.2177091034949841, 0.9760137018789288)), keep=Keep.TOP, mode=Mode.PRIVATE)
    add(fillet_2_piece_7)
    with BuildSketch(Plane(origin=(-35, -100, -35), x_dir=(-1, 0, 0), z_dir=(0, 1, 0))) as fillet_2_piece_8_section:
        with BuildLine():
            CenterArc((FILLET_2_R, -FILLET_2_R), FILLET_2_R, 90, 90)
            Line((0, -FILLET_2_R), (0, 0))
            Line((0, 0), (FILLET_2_R, 0))
        make_face()
    fillet_2_piece_8 = extrude(amount=100, mode=Mode.PRIVATE)
    fillet_2_piece_8 = split(fillet_2_piece_8, bisect_by=Plane(origin=(-44.938627709, -35.444045901, -36.730940637), z_dir=(0.9760137018789288, 0.2177091034949841, 0)), keep=Keep.TOP, mode=Mode.PRIVATE)
    fillet_2_piece_8 = split(fillet_2_piece_8, bisect_by=Plane(origin=(-36.730940637, -35.444045901, -44.938627709), z_dir=(0, 0.2177091034949841, 0.9760137018789288)), keep=Keep.TOP, mode=Mode.PRIVATE)
    add(fillet_2_piece_8)
    with BuildSketch(Plane(origin=(-35, 0, 30), x_dir=(-1, 0, 0), z_dir=(0, -1, 0))) as fillet_2_piece_9_section:
        with BuildLine():
            CenterArc((FILLET_2_R, FILLET_2_R), FILLET_2_R, 180, 90)
            Line((0, FILLET_2_R), (0, 0))
            Line((0, 0), (FILLET_2_R, 0))
        make_face()
    fillet_2_piece_9 = extrude(amount=80, mode=Mode.PRIVATE)
    fillet_2_piece_9 = split(fillet_2_piece_9, bisect_by=Plane(origin=(-44.354586475, -38.062366579, 28.080040712), z_dir=(0.9760137018789288, 0.2177091034949841, 0)), keep=Keep.TOP, mode=Mode.PRIVATE)
    add(fillet_2_piece_9)
    with BuildSketch(Plane(origin=(-35, -100, 35), x_dir=(0, 0, 1), z_dir=(0, 1, 0))) as fillet_2_piece_10_section:
        with BuildLine():
            CenterArc((FILLET_2_R, -FILLET_2_R), FILLET_2_R, 90, 90)
            Line((0, -FILLET_2_R), (0, 0))
            Line((0, 0), (FILLET_2_R, 0))
        make_face()
    fillet_2_piece_10 = extrude(amount=100, mode=Mode.PRIVATE)
    fillet_2_piece_10 = split(fillet_2_piece_10, bisect_by=Plane(origin=(-36.730940637, -35.444045901, 44.938627709), z_dir=(0, 0.2177091034949841, -0.9760137018789288)), keep=Keep.TOP, mode=Mode.PRIVATE)
    fillet_2_piece_10 = split(fillet_2_piece_10, bisect_by=Plane(origin=(-44.938627709, -35.444045901, 36.730940637), z_dir=(0.9760137018789288, 0.2177091034949841, 0)), keep=Keep.TOP, mode=Mode.PRIVATE)
    add(fillet_2_piece_10)
    with BuildSketch(Plane(origin=(30, 0, 35), x_dir=(0, 0, 1), z_dir=(0, -1, 0))) as fillet_2_piece_11_section:
        with BuildLine():
            CenterArc((FILLET_2_R, FILLET_2_R), FILLET_2_R, 180, 90)
            Line((0, FILLET_2_R), (0, 0))
            Line((0, 0), (FILLET_2_R, 0))
        make_face()
    fillet_2_piece_11 = extrude(amount=80, mode=Mode.PRIVATE)
    fillet_2_piece_11 = split(fillet_2_piece_11, bisect_by=Plane(origin=(28.080040712, -38.062366579, 44.354586475), z_dir=(0, 0.2177091034949841, -0.9760137018789288)), keep=Keep.TOP, mode=Mode.PRIVATE)
    add(fillet_2_piece_11)
    with BuildSketch(Plane(origin=(35, 0, 35), x_dir=(1, 0, 0), z_dir=(0, -1, 0))) as fillet_2_piece_12_section:
        with BuildLine():
            CenterArc((FILLET_2_R, FILLET_2_R), FILLET_2_R, 180, 90)
            Line((0, FILLET_2_R), (0, 0))
            Line((0, 0), (FILLET_2_R, 0))
        make_face()
    fillet_2_piece_12 = extrude(amount=100, mode=Mode.PRIVATE)
    fillet_2_piece_12 = split(fillet_2_piece_12, bisect_by=Plane(origin=(44.938627709, -35.444045901, 36.730940637), z_dir=(-0.9760137018789288, 0.2177091034949841, 0)), keep=Keep.TOP, mode=Mode.PRIVATE)
    fillet_2_piece_12 = split(fillet_2_piece_12, bisect_by=Plane(origin=(36.730940637, -35.444045901, 44.938627709), z_dir=(0, 0.2177091034949841, -0.9760137018789288)), keep=Keep.TOP, mode=Mode.PRIVATE)
    add(fillet_2_piece_12)

    # 阵列(圆周)2: 切除-拉伸4 ×4 about axis
    pattern_circular_2_axis = Axis((0, 0, 0), (0, -1, 0))
    for i in range(1, PATTERN_CIRCULAR_2_COUNT):
        add(cut_extrude_4.rotate(pattern_circular_2_axis, i * 360 / PATTERN_CIRCULAR_2_COUNT), mode=Mode.SUBTRACT)


solid = part.part
